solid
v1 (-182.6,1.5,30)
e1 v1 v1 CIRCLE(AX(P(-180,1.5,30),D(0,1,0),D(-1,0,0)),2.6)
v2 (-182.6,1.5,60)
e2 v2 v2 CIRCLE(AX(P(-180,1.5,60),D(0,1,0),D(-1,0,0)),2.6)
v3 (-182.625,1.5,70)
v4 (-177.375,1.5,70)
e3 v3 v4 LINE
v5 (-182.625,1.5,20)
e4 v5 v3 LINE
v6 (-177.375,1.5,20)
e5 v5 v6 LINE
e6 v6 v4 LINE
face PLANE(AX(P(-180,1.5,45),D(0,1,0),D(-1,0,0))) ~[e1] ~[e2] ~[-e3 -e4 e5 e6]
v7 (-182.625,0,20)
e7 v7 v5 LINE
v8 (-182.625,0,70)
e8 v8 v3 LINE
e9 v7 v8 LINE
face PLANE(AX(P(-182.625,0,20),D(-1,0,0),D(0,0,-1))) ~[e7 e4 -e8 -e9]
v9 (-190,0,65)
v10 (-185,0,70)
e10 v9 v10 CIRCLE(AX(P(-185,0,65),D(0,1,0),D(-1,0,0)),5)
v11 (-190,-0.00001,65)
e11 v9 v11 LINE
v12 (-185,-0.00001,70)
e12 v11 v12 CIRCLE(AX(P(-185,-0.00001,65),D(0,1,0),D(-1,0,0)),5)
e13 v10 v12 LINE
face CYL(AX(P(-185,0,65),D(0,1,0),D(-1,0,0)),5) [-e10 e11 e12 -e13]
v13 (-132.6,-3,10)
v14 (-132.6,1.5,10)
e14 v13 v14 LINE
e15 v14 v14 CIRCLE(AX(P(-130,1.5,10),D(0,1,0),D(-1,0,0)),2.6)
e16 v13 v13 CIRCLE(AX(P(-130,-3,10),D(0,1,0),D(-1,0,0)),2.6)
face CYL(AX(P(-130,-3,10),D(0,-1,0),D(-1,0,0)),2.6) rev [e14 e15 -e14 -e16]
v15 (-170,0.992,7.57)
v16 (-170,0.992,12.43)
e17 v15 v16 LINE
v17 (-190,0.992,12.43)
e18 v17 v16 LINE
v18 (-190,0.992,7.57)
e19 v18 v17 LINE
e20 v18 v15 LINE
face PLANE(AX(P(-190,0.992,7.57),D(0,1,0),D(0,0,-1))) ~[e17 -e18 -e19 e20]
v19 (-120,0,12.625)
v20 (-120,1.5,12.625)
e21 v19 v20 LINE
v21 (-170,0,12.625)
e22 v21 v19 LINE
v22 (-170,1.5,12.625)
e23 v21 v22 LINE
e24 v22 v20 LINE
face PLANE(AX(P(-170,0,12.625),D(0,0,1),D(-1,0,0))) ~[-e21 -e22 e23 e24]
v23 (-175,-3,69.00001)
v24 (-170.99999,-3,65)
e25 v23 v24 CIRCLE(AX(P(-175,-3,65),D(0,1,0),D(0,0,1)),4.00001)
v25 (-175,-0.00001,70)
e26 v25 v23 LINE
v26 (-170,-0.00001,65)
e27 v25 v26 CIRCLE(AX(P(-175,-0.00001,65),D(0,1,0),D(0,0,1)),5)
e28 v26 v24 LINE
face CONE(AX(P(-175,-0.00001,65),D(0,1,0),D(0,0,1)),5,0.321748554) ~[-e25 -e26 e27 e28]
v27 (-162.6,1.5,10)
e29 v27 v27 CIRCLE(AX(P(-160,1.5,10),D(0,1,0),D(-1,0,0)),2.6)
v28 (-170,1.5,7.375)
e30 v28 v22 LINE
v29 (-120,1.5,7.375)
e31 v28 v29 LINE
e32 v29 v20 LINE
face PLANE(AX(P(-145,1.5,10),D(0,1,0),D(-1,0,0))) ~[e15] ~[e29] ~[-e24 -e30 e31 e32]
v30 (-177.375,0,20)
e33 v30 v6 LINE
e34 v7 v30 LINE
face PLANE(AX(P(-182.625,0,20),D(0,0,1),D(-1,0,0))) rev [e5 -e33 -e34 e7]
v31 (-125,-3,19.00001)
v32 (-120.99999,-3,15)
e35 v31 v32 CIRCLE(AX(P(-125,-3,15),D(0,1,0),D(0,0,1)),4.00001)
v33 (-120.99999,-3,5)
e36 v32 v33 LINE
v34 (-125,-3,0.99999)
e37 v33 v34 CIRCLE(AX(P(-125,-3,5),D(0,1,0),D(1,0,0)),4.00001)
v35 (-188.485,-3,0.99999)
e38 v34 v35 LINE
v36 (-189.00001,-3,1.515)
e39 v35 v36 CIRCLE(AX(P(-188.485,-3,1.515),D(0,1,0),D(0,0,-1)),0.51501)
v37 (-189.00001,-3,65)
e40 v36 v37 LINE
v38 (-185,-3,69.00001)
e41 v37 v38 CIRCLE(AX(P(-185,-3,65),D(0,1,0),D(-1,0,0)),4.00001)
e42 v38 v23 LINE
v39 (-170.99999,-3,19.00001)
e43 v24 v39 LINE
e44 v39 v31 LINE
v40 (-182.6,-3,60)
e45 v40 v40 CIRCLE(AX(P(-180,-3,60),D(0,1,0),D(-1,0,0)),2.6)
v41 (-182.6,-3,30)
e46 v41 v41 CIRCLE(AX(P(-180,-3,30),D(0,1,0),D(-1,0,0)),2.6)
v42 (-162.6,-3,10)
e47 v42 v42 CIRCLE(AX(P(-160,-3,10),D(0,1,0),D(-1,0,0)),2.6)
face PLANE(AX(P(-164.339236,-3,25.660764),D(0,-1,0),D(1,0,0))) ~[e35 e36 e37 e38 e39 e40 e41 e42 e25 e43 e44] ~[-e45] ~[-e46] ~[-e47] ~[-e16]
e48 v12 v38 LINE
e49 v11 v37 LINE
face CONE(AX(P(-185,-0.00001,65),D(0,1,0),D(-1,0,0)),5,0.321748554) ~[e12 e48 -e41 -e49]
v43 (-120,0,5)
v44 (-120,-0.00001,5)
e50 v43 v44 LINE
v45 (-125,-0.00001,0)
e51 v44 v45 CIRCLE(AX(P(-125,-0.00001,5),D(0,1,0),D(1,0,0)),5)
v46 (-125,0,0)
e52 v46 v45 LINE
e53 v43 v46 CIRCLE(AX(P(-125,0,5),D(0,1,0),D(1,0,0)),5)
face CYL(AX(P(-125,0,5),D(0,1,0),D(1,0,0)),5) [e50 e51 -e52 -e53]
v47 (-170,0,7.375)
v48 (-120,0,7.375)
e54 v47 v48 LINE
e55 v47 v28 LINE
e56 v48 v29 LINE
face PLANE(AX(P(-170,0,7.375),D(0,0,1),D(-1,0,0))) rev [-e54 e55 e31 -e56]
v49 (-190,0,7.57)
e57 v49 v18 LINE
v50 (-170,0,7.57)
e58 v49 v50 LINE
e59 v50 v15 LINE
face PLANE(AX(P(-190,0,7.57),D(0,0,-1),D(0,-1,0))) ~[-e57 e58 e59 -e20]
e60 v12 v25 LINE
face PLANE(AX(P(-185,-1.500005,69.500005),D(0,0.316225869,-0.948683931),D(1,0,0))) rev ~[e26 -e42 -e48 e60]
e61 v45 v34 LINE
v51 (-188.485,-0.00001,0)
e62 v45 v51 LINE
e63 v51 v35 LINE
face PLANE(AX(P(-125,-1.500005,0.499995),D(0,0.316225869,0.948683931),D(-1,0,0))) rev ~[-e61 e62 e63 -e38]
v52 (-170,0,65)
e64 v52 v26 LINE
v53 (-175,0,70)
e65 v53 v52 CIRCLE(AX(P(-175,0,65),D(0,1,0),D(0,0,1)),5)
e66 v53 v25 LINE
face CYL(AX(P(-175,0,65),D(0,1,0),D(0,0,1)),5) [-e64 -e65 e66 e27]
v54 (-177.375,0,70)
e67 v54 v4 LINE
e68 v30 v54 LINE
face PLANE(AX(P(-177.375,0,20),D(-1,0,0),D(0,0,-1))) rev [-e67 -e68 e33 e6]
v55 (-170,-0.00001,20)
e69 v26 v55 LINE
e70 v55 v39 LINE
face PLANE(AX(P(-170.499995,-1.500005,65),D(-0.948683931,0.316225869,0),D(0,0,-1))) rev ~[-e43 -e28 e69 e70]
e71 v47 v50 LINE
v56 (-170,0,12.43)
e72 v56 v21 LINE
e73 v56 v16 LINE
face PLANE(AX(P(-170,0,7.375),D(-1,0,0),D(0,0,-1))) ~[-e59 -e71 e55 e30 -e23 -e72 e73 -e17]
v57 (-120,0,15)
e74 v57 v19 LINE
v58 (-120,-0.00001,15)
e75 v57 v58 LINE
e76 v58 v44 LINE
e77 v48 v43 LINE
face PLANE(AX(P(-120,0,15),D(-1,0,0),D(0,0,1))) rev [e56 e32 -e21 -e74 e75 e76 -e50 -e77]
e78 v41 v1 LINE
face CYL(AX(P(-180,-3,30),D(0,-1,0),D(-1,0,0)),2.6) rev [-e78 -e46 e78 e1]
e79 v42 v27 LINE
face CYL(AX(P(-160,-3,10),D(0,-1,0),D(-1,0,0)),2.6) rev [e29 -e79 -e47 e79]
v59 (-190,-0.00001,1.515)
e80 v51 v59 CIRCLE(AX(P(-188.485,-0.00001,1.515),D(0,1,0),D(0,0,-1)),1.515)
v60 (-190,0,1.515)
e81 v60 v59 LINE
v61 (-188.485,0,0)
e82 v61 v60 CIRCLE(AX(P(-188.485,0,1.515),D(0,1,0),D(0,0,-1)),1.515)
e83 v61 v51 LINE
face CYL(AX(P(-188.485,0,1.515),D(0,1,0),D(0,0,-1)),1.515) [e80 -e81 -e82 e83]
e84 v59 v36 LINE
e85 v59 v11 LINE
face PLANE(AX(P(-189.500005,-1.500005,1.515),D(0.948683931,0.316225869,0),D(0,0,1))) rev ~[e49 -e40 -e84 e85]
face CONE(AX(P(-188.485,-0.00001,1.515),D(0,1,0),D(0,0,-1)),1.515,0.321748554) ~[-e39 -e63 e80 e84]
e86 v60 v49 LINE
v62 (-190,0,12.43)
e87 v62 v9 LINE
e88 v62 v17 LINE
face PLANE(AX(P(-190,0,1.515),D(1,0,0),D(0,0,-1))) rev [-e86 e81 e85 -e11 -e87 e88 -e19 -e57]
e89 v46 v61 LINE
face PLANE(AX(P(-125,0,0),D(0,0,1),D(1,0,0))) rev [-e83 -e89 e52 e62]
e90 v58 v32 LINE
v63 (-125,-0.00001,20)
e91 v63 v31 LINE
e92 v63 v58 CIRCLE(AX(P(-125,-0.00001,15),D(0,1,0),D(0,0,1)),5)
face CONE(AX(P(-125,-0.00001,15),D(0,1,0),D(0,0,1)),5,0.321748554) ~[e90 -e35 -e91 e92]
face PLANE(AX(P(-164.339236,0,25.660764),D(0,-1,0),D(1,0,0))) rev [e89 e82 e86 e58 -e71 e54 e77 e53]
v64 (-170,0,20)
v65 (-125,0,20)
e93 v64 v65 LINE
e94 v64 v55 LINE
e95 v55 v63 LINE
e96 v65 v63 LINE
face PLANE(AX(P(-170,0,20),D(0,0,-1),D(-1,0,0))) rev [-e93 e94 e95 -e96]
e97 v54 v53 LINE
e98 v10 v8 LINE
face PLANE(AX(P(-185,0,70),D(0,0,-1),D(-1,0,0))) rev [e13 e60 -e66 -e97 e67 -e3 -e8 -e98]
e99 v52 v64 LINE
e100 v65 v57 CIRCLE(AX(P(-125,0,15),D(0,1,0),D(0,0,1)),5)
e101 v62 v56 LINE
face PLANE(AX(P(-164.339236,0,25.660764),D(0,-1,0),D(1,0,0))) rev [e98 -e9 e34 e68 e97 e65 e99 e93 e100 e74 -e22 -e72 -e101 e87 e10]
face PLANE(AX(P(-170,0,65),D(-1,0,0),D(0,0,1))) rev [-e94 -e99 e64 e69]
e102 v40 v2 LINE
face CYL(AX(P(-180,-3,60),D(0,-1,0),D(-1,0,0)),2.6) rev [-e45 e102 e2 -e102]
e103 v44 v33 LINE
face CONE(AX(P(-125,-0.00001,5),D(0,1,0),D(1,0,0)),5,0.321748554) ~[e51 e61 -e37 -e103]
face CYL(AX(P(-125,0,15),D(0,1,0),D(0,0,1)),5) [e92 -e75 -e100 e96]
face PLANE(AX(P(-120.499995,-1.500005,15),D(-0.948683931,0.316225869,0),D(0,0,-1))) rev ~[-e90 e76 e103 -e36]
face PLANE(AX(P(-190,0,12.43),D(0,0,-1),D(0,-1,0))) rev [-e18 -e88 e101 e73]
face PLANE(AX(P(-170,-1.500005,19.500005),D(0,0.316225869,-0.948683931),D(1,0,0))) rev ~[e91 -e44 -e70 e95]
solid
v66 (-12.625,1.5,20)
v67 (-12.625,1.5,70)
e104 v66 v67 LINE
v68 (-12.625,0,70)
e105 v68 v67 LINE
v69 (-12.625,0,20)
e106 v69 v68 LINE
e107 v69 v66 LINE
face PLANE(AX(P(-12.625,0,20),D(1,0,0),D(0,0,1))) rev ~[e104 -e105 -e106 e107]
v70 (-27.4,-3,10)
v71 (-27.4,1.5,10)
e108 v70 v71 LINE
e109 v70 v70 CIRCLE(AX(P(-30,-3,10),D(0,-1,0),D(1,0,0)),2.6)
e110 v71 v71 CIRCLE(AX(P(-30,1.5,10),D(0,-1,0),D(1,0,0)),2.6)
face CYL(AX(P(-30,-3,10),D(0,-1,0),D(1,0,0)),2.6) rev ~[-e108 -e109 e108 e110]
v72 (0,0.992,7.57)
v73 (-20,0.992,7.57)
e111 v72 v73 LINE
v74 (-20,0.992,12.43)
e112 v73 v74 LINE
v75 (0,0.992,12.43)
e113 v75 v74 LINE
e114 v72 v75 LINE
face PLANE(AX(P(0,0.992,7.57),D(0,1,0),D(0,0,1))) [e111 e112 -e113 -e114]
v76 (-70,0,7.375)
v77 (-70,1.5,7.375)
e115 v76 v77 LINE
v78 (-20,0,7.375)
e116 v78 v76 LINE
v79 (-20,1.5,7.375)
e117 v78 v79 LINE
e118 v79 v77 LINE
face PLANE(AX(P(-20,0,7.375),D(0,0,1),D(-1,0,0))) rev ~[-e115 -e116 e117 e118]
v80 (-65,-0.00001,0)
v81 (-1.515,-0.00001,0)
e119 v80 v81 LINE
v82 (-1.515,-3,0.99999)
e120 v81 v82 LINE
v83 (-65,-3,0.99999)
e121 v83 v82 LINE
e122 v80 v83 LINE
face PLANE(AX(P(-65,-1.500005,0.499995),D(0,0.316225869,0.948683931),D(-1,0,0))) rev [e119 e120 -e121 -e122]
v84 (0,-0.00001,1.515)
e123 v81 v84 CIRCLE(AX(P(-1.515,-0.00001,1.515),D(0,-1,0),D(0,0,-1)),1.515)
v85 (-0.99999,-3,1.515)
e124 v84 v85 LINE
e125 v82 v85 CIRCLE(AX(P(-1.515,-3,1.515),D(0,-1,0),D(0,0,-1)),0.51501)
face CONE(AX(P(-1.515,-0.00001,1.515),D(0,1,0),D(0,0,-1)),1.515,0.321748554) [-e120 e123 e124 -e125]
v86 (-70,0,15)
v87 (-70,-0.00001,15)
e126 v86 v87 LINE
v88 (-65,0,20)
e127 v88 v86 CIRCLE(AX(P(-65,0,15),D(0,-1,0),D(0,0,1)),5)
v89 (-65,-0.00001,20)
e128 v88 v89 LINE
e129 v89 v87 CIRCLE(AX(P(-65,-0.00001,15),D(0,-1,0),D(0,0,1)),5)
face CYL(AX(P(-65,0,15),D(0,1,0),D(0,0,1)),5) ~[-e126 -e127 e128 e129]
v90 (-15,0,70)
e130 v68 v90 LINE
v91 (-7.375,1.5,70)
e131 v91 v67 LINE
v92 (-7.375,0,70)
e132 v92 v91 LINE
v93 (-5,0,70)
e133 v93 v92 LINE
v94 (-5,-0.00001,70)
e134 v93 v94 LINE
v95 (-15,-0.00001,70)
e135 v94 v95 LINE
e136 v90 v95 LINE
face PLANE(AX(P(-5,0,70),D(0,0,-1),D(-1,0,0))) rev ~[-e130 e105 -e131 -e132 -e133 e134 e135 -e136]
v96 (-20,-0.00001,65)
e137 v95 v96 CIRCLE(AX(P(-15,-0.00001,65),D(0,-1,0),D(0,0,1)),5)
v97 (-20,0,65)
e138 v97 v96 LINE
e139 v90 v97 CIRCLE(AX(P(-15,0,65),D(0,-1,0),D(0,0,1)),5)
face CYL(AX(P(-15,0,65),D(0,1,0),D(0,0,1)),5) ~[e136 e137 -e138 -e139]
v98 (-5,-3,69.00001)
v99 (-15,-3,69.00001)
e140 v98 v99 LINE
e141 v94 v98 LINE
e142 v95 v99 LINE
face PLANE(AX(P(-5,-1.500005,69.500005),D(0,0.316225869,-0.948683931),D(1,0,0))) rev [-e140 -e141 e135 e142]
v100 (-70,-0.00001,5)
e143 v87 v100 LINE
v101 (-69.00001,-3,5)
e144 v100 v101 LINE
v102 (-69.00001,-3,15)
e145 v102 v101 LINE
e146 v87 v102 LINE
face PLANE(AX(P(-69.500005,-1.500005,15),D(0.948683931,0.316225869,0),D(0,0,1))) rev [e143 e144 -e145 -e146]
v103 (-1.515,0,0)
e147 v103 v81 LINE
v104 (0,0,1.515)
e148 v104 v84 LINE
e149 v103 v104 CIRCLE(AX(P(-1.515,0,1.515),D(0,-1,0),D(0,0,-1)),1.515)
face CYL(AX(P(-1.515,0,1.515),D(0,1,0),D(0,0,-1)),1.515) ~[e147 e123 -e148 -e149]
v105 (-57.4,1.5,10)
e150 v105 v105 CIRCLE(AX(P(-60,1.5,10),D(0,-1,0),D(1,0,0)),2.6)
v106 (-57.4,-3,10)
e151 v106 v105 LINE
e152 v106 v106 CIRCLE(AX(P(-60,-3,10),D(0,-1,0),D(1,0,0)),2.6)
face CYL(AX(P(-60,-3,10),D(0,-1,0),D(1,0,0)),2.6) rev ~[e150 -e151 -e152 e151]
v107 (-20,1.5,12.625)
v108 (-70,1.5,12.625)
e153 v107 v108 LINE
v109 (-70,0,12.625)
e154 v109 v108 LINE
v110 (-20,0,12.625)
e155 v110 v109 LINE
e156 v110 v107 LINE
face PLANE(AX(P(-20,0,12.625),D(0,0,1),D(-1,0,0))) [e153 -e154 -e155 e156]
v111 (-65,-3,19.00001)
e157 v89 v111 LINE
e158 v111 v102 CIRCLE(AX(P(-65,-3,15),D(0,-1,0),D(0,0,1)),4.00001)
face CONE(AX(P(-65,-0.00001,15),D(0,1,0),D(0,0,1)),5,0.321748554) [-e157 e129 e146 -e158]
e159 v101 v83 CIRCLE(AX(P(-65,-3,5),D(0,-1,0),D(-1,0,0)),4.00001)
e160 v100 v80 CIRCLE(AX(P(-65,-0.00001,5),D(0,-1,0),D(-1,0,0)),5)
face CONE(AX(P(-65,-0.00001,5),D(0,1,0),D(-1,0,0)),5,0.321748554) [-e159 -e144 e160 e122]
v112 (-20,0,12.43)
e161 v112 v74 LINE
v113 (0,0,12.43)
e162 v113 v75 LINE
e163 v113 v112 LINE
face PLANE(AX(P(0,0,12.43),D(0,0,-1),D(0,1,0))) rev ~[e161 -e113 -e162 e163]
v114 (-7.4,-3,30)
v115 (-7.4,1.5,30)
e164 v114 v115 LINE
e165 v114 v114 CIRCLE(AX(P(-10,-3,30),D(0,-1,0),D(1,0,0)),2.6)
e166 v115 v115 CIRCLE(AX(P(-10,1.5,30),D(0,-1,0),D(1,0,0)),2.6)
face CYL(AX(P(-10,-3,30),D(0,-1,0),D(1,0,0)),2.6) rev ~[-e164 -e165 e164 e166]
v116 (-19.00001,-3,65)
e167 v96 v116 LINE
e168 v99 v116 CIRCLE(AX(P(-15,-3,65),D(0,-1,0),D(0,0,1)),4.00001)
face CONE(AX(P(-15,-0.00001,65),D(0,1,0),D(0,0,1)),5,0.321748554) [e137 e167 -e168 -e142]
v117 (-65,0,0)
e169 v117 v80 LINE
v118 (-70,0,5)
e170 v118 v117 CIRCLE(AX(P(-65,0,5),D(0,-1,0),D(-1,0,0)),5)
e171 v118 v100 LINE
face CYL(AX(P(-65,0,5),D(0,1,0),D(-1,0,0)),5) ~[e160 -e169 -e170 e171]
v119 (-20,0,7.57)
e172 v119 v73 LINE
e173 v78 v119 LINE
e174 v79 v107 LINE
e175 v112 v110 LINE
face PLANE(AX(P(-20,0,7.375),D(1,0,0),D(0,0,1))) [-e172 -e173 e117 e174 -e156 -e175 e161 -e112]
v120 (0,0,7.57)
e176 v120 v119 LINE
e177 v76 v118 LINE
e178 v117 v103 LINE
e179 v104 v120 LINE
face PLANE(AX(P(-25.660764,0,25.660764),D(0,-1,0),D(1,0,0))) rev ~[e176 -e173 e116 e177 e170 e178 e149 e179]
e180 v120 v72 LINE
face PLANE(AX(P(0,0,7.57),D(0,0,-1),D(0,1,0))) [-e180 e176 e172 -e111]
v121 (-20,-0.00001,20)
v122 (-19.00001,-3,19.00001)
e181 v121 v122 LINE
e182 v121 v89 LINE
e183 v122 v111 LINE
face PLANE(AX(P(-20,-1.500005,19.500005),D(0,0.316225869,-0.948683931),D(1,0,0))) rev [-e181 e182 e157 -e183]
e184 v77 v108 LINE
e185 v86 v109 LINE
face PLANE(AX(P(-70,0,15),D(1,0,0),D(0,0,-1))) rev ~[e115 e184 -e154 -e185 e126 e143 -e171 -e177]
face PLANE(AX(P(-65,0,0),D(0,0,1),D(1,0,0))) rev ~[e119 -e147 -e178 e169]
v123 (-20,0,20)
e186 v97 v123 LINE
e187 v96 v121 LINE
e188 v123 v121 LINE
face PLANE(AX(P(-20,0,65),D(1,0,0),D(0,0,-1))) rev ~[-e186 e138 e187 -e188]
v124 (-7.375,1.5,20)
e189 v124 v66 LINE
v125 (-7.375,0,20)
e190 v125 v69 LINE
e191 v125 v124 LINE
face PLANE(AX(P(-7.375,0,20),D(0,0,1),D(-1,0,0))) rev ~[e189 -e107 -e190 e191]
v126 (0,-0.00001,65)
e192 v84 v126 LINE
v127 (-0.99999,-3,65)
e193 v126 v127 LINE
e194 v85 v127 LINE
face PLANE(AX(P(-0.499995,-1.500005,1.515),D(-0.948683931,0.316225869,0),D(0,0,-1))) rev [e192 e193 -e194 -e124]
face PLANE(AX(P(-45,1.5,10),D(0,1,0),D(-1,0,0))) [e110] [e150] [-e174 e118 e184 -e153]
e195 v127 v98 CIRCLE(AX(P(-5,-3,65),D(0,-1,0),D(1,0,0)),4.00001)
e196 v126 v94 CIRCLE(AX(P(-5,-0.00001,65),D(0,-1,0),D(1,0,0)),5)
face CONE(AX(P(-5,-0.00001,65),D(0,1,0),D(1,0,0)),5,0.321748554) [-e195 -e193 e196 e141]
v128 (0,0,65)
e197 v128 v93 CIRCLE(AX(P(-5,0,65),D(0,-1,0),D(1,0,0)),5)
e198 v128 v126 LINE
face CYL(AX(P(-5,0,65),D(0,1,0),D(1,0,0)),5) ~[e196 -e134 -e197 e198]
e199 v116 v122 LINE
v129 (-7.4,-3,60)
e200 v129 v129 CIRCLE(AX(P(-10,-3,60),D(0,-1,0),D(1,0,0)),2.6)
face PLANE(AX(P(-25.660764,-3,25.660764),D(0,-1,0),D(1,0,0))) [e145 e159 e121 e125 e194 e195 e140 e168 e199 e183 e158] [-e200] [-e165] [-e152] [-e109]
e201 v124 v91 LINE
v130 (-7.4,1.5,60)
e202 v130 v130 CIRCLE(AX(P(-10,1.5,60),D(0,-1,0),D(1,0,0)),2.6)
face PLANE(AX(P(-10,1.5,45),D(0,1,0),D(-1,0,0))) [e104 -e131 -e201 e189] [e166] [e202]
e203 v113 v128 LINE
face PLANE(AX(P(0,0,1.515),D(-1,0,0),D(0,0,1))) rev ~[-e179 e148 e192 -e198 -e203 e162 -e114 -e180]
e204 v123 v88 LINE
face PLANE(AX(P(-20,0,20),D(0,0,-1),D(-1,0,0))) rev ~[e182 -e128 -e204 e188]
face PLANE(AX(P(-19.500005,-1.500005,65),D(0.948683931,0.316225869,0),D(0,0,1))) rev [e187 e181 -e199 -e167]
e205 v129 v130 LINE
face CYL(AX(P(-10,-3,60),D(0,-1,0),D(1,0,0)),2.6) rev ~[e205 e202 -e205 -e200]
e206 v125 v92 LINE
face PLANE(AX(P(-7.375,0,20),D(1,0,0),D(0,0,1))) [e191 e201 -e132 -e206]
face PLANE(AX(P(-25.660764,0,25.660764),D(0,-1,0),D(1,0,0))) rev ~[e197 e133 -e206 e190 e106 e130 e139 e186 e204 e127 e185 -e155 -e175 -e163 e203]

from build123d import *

# Parameters (mm, degrees)
F1_DEPTH = 3
F2_W     = 0.992
F2_H     = 4.86
F3_DEPTH = 20
F4_W     = 5.25
F4_H     = 50
F4_W_2   = 50
F4_H_2   = 5.25
F5_DEPTH = 1.5
F6_R     = 2.6
F7_DEPTH = 4.501
F9_SIZE2 = 0.99999
F9_SIZE  = 2.99999


# Not quite as in the source:
# - a fillet or chamfer is up to 0.001 mm smaller than in the source, because OpenCascade refuses the exact size


with BuildPart() as f1:
    # F0 (on Front) → F1 (new body)
    with BuildSketch(Plane.XZ):
        with BuildLine():
            ThreePointArc((-1.515, 0), (-0.4437332265, 0.4437332265), (0, 1.515))
            Line((0, 1.515), (0, 65))
            ThreePointArc((0, 65), (-1.4644660941, 68.5355339059), (-5, 70))
            Line((-5, 70), (-15, 70))
            ThreePointArc((-15, 70), (-18.5355339059, 68.5355339059), (-20, 65))
            Line((-20, 65), (-20, 20))
            Line((-20, 20), (-65, 20))
            ThreePointArc((-65, 20), (-68.5355339059, 18.5355339059), (-70, 15))
            Line((-70, 15), (-70, 5))
            ThreePointArc((-70, 5), (-68.5355339059, 1.4644660941), (-65, 0))
            Line((-65, 0), (-1.515, 0))
        make_face()
    extrude(amount=F1_DEPTH)

    # F2 (on face) → F3 (join)
    with BuildSketch(Plane.YZ):
        with Locations((0.496, 10)):
            Rectangle(F2_W, F2_H)
    extrude(amount=-F3_DEPTH)

    # F4 (on face) → F5 (join)
    with BuildSketch(Plane(origin=(0, 0, 0), x_dir=(-1, 0, 0), z_dir=(0, 1, 0))):
        with Locations((10, 45)):
            Rectangle(F4_W, F4_H)
        with Locations((45, 10)):
            Rectangle(F4_W_2, F4_H_2)
    extrude(amount=F5_DEPTH)

    # F6 (on face) → F7 (cut, through all)
    with BuildSketch(Plane.XZ.offset(3)):
        with Locations((-10, 60)):
            Circle(F6_R)
        with Locations((-10, 30)):
            Circle(F6_R)
        with Locations((-30, 10)):
            Circle(F6_R)
        with Locations((-60, 10)):
            Circle(F6_R)
    extrude(amount=-F7_DEPTH, mode=Mode.SUBTRACT)

    # F9 (size 3 and 1 in the source; OpenCascade refuses exactly that, so slightly less here)
    f9_edges = [f1.edges().sort_by_distance(p)[0] for p in [
        (-42.5, -3, 20),
    ]]
    f9_side = f1.faces().sort_by_distance((-42.5, -1.5, 20))[0]
    chamfer(f9_edges, length=F9_SIZE, length2=F9_SIZE2, reference=f9_side)


with BuildPart() as f10_1:
    # F10: instance of F1
    add(f1.part.mirror(Plane(origin=(-95, -1.0321782178, 10), x_dir=(0, -1, 0), z_dir=(-1, 0, 0))))


solid = Compound([f1.part, f10_1.part])
